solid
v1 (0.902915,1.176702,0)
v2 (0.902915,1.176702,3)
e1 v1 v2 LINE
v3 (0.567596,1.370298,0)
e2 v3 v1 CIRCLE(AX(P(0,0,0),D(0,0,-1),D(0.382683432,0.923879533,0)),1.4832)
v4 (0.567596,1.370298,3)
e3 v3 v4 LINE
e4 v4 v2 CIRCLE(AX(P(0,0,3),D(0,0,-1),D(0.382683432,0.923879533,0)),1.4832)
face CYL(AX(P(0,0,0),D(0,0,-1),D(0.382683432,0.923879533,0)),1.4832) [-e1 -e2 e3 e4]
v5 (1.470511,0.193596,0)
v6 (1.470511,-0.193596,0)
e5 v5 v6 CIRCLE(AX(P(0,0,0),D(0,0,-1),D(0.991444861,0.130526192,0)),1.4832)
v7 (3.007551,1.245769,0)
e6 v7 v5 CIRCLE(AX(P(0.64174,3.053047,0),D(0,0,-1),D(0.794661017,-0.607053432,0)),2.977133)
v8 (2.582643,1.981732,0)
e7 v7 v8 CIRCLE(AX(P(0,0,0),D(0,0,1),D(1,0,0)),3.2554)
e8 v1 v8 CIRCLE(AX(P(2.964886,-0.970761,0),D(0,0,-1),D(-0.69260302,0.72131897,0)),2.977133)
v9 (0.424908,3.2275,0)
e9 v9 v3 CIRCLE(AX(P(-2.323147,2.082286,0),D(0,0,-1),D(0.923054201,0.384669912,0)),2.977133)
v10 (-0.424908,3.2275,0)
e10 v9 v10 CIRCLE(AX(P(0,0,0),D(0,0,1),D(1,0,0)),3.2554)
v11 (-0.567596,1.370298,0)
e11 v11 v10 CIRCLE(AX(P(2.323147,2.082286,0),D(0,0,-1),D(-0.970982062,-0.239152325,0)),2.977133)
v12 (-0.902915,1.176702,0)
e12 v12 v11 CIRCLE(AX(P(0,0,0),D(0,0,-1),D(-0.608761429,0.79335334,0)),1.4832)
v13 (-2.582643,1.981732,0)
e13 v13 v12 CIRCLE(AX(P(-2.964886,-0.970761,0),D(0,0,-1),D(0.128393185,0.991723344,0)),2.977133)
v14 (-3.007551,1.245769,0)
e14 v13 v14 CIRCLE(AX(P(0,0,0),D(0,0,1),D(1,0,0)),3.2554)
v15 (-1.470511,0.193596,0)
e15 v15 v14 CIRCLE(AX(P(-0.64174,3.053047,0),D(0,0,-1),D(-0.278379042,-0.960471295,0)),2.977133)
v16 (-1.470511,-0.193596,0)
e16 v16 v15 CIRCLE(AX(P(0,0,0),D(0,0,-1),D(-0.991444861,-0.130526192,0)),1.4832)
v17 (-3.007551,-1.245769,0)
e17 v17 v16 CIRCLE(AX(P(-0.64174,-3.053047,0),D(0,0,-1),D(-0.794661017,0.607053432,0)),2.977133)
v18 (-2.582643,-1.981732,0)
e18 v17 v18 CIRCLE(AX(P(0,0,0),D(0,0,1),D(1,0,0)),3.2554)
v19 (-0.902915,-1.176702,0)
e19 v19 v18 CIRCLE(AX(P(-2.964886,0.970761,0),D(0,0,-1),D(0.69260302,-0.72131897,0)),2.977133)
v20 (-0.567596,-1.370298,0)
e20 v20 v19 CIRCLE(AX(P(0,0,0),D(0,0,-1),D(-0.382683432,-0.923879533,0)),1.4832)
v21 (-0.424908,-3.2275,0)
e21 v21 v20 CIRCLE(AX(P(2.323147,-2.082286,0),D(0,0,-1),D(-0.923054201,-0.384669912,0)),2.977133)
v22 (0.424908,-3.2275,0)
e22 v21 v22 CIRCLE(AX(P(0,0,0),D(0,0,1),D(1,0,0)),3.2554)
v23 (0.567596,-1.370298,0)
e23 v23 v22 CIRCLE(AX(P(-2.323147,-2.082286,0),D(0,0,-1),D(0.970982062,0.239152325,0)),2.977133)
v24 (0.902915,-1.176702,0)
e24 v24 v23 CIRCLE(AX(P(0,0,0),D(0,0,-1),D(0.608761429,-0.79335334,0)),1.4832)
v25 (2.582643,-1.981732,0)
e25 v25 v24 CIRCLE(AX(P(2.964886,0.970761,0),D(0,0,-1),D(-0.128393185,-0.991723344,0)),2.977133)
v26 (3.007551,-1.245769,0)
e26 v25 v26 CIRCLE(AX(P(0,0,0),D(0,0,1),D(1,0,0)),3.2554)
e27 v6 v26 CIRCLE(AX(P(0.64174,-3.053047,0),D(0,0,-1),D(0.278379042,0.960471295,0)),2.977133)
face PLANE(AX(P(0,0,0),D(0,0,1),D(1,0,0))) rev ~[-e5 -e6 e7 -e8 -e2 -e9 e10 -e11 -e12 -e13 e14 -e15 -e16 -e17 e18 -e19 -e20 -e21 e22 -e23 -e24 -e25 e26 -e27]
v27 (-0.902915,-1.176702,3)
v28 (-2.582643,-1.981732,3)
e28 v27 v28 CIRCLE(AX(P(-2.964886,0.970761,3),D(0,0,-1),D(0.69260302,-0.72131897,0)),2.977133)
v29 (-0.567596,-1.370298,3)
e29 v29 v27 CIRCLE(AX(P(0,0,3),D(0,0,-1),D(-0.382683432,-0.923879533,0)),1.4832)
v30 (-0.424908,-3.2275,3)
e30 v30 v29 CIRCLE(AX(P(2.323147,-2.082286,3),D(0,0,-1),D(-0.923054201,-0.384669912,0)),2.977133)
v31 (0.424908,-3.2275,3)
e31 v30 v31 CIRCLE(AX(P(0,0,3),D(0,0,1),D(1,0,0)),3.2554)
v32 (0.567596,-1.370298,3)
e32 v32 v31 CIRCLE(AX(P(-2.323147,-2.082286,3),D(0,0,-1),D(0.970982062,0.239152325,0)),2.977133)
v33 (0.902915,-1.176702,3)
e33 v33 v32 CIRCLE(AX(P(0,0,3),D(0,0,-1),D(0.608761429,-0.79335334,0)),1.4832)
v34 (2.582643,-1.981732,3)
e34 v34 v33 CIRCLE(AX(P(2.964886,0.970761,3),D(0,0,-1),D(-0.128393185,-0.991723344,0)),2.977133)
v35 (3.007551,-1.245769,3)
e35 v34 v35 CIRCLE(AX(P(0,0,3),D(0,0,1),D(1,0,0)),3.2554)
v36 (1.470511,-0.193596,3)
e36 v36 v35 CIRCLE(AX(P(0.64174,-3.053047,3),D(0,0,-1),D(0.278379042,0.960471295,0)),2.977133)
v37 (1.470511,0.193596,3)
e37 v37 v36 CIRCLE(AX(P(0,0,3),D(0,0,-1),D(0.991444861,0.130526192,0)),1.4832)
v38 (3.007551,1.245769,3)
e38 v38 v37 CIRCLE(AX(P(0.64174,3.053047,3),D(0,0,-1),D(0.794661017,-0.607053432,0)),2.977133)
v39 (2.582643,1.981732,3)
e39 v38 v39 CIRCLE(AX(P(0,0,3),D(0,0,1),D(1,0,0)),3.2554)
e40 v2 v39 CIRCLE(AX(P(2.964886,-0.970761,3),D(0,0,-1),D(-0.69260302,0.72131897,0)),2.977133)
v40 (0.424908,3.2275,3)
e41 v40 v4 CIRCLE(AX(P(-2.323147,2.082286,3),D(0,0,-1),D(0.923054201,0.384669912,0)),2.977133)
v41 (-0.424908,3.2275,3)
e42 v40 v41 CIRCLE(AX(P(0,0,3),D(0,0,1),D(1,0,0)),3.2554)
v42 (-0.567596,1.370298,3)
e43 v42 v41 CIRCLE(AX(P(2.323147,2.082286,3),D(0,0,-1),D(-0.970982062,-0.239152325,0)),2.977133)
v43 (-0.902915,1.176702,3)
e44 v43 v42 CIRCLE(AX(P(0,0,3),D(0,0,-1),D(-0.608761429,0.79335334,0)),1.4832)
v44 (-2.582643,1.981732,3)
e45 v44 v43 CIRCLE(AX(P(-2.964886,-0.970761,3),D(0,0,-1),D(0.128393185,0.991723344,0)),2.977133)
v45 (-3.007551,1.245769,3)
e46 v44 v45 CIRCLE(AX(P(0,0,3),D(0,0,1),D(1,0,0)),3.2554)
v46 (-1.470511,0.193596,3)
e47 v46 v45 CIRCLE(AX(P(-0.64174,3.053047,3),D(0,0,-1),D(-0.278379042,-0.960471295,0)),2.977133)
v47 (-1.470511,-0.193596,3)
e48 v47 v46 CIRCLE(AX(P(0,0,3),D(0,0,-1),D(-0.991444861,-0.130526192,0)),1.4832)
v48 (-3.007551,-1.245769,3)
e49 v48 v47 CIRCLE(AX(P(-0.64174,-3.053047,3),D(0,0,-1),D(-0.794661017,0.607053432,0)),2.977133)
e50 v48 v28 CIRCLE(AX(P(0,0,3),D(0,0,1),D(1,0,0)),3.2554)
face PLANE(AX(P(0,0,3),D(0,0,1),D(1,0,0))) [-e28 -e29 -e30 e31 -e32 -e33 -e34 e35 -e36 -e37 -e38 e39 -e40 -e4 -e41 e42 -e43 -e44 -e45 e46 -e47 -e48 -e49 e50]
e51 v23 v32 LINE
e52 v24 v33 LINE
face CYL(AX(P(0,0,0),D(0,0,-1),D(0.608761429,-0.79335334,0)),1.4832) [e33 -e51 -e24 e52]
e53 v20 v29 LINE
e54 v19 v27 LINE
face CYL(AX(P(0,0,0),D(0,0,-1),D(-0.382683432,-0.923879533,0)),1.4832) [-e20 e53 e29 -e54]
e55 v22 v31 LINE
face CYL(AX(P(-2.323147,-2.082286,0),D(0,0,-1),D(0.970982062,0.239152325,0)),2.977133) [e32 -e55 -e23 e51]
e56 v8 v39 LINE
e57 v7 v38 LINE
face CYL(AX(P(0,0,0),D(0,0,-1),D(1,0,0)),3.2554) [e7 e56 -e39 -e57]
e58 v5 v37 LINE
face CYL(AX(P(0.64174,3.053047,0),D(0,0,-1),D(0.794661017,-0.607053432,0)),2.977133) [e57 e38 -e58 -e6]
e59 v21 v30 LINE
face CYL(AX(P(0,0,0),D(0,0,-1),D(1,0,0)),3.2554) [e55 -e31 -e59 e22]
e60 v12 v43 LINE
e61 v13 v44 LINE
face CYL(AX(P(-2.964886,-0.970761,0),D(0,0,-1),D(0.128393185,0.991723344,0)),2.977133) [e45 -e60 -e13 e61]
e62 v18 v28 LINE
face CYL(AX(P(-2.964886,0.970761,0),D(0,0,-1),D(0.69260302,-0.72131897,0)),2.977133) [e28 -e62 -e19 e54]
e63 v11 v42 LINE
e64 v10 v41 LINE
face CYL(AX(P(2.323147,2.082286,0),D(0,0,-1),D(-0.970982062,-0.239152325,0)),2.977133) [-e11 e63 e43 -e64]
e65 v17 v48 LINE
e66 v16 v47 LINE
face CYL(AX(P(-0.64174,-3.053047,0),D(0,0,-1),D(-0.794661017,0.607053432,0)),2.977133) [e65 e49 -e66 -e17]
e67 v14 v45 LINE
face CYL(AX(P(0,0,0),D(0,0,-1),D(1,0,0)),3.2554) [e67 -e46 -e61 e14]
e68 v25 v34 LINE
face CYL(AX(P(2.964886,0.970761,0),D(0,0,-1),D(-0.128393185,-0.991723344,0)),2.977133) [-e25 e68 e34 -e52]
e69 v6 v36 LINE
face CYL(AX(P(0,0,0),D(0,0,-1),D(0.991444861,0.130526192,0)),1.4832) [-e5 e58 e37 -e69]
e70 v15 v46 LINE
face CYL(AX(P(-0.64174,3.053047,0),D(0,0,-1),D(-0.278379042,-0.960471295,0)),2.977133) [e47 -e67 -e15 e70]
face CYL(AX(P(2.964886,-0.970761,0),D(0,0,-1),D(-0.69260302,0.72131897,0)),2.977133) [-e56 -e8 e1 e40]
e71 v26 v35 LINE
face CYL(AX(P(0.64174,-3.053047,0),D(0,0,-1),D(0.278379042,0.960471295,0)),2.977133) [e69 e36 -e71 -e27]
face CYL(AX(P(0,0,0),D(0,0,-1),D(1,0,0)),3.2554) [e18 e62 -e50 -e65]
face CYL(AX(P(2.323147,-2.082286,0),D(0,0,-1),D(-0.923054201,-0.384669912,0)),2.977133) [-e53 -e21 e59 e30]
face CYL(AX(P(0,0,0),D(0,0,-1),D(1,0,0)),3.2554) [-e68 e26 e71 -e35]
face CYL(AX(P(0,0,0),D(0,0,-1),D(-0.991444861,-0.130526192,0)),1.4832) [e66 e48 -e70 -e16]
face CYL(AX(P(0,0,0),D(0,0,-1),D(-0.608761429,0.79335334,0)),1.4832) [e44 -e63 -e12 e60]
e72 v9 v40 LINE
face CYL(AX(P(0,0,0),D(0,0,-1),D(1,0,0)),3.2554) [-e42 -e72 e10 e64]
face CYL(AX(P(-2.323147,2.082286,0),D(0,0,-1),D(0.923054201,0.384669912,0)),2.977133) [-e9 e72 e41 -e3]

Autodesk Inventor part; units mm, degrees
sketch "Sketch1" plane through (0, 0, 0) normal (0, 0, 1) x (1, 0, 0)
  circle A0 centre (0, 0) radius 3.2554
  dimension "d0" = 6.5107
extrude "Extrusion1" add sketch "Sketch1" along normal blind 3
ref_plane "Work Plane2" through (0, 0, 1.5) normal (0, 0, 1) x (1, 0, 0)
sketch "Sketch2" plane through (0, 0, 0) normal (0, 0, -1) x (-1, 0, 0)
  circle A0 centre (0, 0) radius 3.2554 projected
  circle A1 centre (0, 0) radius 2.4643
  dimension "d3" = 4.9286
surface extrude "中径" sketch "Sketch2" against normal through all shown no curves A1
ref_plane "Work Plane8" through (0, 0, 0) normal (0.8660254, 0.5, 0) x (0, 0, 1)
ref_plane "Work Plane9" through (0, 0, 0) normal (1, 0, 0) x (0, 1, 0)
spur gear teeth "正齿轮" teeth 6 pitch diameter 4.8 tip diameter 6.5107 root diameter 2.9664 face width 3 start plane through (0, 0, 0) normal (0, 0, -1) x (-1, 0, 0)
equation "\"d0\" = da_da"
equation "\"d1\" = da_b"
equation "\"d3\" = da_dw"
equation "\"d16\" = da_aw"
equation "\"d43\" = da_aw"
equation "\"d46\" = da_aw"
equation "\"da_da\" = 6.510702"
equation "\"da_b\" = 3"
equation "\"da_dw\" = 4.928571"
equation "\"da_aw\" = 11.5"
properties part number "正齿轮1" material "Steel"
